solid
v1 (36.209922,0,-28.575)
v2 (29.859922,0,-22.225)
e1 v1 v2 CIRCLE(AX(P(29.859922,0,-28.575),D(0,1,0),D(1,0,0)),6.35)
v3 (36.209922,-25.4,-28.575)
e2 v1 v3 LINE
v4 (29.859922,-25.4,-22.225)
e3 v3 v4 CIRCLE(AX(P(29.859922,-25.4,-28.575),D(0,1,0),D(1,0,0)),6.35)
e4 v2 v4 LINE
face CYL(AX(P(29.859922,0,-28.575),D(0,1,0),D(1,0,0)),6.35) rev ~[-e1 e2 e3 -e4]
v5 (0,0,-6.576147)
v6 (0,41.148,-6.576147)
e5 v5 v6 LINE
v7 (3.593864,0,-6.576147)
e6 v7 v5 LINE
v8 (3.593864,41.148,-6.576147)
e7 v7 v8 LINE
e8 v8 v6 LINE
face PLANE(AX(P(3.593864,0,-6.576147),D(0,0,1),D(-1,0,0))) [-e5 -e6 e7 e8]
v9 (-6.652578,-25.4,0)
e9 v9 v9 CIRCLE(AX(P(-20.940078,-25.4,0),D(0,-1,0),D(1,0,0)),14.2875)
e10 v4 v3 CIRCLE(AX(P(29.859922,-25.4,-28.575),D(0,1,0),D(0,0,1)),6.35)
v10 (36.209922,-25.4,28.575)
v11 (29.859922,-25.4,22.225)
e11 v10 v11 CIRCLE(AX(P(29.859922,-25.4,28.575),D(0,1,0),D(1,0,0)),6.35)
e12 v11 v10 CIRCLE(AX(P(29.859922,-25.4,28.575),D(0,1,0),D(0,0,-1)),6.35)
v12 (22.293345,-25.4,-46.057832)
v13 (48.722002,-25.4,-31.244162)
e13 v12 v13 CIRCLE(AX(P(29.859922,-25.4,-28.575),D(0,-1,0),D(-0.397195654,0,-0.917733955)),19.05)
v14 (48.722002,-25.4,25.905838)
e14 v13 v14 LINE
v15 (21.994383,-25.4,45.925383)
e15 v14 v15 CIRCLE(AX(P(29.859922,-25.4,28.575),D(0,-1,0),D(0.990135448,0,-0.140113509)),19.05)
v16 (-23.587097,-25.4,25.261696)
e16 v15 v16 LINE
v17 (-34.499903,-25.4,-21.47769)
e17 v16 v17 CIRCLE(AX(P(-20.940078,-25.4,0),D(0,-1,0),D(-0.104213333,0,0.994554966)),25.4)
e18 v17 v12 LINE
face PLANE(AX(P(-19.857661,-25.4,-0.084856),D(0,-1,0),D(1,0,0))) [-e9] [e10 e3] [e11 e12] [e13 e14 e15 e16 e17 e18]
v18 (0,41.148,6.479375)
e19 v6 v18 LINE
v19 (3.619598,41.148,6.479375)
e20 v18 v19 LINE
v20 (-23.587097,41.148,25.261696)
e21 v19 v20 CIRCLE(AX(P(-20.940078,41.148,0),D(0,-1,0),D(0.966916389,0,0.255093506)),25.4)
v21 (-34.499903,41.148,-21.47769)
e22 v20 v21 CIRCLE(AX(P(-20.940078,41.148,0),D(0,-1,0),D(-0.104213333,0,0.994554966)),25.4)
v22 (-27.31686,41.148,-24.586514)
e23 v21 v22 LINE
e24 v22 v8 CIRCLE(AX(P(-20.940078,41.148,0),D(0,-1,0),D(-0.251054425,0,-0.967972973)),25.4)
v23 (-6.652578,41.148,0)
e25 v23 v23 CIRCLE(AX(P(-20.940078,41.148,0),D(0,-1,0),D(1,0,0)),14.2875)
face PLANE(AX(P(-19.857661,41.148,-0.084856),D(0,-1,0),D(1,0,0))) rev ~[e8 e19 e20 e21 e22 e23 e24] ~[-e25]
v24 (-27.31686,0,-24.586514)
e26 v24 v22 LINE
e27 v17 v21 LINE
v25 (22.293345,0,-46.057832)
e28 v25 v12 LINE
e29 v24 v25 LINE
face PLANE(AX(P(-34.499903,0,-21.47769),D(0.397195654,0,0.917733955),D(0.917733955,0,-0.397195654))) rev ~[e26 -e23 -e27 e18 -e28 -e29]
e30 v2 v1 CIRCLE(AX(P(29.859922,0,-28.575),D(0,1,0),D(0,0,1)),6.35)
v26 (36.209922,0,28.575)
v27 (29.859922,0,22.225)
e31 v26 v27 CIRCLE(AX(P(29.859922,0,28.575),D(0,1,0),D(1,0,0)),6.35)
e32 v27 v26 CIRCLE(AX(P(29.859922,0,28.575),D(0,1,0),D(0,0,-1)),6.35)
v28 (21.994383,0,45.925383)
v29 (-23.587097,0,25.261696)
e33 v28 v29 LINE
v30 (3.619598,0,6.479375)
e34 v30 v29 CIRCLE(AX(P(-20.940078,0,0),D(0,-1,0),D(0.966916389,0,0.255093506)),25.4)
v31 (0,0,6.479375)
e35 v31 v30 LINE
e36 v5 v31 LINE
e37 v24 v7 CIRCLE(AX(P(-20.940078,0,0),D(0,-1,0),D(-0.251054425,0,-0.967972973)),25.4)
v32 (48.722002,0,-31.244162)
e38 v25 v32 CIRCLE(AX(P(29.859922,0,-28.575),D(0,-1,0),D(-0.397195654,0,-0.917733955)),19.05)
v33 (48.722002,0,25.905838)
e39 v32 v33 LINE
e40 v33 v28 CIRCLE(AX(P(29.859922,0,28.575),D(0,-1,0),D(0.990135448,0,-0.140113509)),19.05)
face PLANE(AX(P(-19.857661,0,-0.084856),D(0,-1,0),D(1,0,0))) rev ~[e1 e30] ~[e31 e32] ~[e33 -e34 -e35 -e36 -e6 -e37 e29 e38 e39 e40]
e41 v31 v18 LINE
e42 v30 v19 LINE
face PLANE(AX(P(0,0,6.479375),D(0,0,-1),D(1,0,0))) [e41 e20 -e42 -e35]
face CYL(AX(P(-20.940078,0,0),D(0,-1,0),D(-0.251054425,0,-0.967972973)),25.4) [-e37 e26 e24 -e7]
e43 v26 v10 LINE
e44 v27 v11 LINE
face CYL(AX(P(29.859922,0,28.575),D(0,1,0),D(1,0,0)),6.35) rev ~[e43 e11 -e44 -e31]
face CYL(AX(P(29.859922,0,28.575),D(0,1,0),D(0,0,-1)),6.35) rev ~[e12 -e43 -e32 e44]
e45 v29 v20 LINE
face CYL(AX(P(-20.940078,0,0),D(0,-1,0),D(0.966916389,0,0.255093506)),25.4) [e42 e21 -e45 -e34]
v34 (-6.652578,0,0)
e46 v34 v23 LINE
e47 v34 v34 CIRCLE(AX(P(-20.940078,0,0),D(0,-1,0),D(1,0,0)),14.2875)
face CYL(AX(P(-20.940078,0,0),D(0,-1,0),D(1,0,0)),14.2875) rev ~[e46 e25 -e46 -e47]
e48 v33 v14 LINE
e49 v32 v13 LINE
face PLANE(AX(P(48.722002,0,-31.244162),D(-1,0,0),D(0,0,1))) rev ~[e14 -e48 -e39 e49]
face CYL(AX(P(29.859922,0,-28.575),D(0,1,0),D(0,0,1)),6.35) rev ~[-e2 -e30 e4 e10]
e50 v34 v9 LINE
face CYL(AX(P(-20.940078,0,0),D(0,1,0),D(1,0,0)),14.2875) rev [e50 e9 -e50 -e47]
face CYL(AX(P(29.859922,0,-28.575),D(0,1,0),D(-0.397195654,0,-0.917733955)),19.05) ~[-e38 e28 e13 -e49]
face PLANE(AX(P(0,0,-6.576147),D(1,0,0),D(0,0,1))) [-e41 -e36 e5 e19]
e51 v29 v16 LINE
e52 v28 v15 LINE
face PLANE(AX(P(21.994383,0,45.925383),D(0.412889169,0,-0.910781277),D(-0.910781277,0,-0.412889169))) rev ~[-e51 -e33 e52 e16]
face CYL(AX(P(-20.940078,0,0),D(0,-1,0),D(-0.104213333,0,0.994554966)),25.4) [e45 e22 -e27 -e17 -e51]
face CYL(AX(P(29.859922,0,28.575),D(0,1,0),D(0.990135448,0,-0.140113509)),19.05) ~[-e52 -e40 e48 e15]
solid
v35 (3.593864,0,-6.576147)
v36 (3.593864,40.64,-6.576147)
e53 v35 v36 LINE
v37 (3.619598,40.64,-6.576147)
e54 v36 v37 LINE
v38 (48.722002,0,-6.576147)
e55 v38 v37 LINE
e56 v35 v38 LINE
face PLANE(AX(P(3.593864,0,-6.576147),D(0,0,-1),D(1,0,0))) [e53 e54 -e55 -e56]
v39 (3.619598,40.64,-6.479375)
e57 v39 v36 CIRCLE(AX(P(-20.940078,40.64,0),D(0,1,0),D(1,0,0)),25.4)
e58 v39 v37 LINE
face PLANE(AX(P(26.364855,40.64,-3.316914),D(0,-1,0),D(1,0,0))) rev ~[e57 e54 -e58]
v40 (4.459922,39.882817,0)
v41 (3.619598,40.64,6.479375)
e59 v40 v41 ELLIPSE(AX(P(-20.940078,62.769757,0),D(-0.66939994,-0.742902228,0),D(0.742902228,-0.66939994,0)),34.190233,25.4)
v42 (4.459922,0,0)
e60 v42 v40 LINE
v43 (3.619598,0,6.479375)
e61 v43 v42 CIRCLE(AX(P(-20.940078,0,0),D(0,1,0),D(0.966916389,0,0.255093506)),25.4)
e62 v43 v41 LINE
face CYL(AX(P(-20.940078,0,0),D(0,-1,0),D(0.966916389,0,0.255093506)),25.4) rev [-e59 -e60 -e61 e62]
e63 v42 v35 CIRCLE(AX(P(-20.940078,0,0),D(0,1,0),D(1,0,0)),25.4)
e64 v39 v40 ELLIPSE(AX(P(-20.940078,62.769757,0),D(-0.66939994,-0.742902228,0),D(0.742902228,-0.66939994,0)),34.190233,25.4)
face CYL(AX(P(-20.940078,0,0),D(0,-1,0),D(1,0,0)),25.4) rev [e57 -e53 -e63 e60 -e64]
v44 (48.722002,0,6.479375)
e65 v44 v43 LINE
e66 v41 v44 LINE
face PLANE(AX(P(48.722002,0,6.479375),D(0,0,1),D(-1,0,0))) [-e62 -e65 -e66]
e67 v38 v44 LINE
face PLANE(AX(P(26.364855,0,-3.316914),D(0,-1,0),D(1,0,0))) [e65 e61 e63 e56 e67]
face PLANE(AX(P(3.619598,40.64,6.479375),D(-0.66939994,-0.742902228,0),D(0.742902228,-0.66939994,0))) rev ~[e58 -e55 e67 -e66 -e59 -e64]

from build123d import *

# Parameters (mm, degrees)
F0_R     = 14.2875
F1_DEPTH = 25.4
F2_DEPTH = 41.148
F3_DEPTH = 40.64
F5_DEPTH = 25.4


with BuildPart() as f1:
    # F0 (on Front) → F1 (new body)
    with BuildSketch(Plane.XZ):
        with BuildLine():
            Line((0, -6.5761469305), (0, 0))
            Line((0, 0), (0, 6.4793750644))
            Line((0, 6.4793750644), (3.6195983623, 6.4793750644))
            ThreePointArc((3.6195983623, 6.4793750644), (-6.5097266562, 20.9027501202), (-23.5870965608, 25.2616961481))
            ThreePointArc((-23.5870965608, 25.2616961481), (-45.6748305827, 5.7751199465), (-34.4999026403, -21.4776896658))
            Line((-34.4999026403, -21.4776896658), (-27.3168603147, -24.5865135025))
            ThreePointArc((-27.3168603147, -24.5865135025), (-8.1528212193, -21.9464362992), (3.5938637092, -6.5761469305))
            Line((3.5938637092, -6.5761469305), (0, -6.5761469305))
        make_face()
        with Locations((-20.9400779136, 0)):
            Circle(F0_R, mode=Mode.SUBTRACT)
        with BuildLine():
            Line((0, 6.4793750644), (0, 0))
            Line((0, 0), (4.4599220864, 0))
            ThreePointArc((4.4599220864, 0), (4.2489651152, 3.2668197527), (3.6195983623, 6.4793750644))
            Line((3.6195983623, 6.4793750644), (0, 6.4793750644))
        make_face()
        with BuildLine():
            Line((4.4599220864, 0), (0, 0))
            Line((0, 0), (0, -6.5761469305))
            Line((0, -6.5761469305), (3.5938637092, -6.5761469305))
            ThreePointArc((3.5938637092, -6.5761469305), (4.2424767346, -3.3164651952), (4.4599220864, 0))
        make_face()
        with BuildLine():
            Line((29.8599220864, 0), (4.4599220864, 0))
            ThreePointArc((4.4599220864, 0), (4.2424767346, -3.3164651952), (3.5938637092, -6.5761469305))
            Line((3.5938637092, -6.5761469305), (48.7220023626, -6.5761469305))
            Line((48.7220023626, -6.5761469305), (48.7220023626, 0))
            Line((48.7220023626, 0), (29.8599220864, 0))
        make_face()
        with BuildLine():
            ThreePointArc((3.6195983623, 6.4793750644), (4.2489651152, 3.2668197527), (4.4599220864, 0))
            Line((4.4599220864, 0), (29.8599220864, 0))
            Line((29.8599220864, 0), (48.7220023626, 0))
            Line((48.7220023626, 0), (48.7220023626, 6.4793750644))
            Line((48.7220023626, 6.4793750644), (3.6195983623, 6.4793750644))
        make_face()
        with BuildLine():
            Line((48.7220023626, -6.5761469305), (3.5938637092, -6.5761469305))
            ThreePointArc((3.5938637092, -6.5761469305), (-8.1528212193, -21.9464362992), (-27.3168603147, -24.5865135025))
            Line((-27.3168603147, -24.5865135025), (22.2933448748, -46.0578318444))
            ThreePointArc((22.2933448748, -46.0578318444), (39.1743355589, -45.1925871192), (48.7220023626, -31.2441623508))
            Line((48.7220023626, -31.2441623508), (48.7220023626, -25.9058376492))
            Line((48.7220023626, -25.9058376492), (48.7220023626, -6.5761469305))
        make_face()
        with BuildLine():
            ThreePointArc((29.8599220864, -22.225), (34.350050147, -24.0848719395), (36.2099220864, -28.575))
            ThreePointArc((36.2099220864, -28.575), (25.3697940259, -33.0651280605), (29.8599220864, -22.225))
        make_face(mode=Mode.SUBTRACT)
        with BuildLine():
            ThreePointArc((-23.5870965608, 25.2616961481), (-6.5097266562, 20.9027501202), (3.6195983623, 6.4793750644))
            Line((3.6195983623, 6.4793750644), (48.7220023626, 6.4793750644))
            Line((48.7220023626, 6.4793750644), (48.7220023626, 25.9058376492))
            ThreePointArc((48.7220023626, 25.9058376492), (41.2803657765, 43.8221625532), (21.9943834178, 45.9253833229))
            Line((21.9943834178, 45.9253833229), (-23.5870965608, 25.2616961481))
        make_face()
        with BuildLine():
            ThreePointArc((29.8599220864, 22.225), (25.3697940259, 33.0651280605), (36.2099220864, 28.575))
            ThreePointArc((36.2099220864, 28.575), (34.350050147, 24.0848719395), (29.8599220864, 22.225))
        make_face(mode=Mode.SUBTRACT)
    extrude(amount=F1_DEPTH)

    # F0 (on Front) → F2 (join)
    with BuildSketch(Plane.XZ):
        with BuildLine():
            Line((0, -6.5761469305), (0, 0))
            Line((0, 0), (0, 6.4793750644))
            Line((0, 6.4793750644), (3.6195983623, 6.4793750644))
            ThreePointArc((3.6195983623, 6.4793750644), (-6.5097266562, 20.9027501202), (-23.5870965608, 25.2616961481))
            ThreePointArc((-23.5870965608, 25.2616961481), (-45.6748305827, 5.7751199465), (-34.4999026403, -21.4776896658))
            Line((-34.4999026403, -21.4776896658), (-27.3168603147, -24.5865135025))
            ThreePointArc((-27.3168603147, -24.5865135025), (-8.1528212193, -21.9464362992), (3.5938637092, -6.5761469305))
            Line((3.5938637092, -6.5761469305), (0, -6.5761469305))
        make_face()
        with Locations((-20.9400779136, 0)):
            Circle(F0_R, mode=Mode.SUBTRACT)
    extrude(amount=-F2_DEPTH)


with BuildPart() as f3:
    # F0 (on Front) → F3 (new body)
    with BuildSketch(Plane.XZ):
        with BuildLine():
            Line((29.8599220864, 0), (4.4599220864, 0))
            ThreePointArc((4.4599220864, 0), (4.2424767346, -3.3164651952), (3.5938637092, -6.5761469305))
            Line((3.5938637092, -6.5761469305), (48.7220023626, -6.5761469305))
            Line((48.7220023626, -6.5761469305), (48.7220023626, 0))
            Line((48.7220023626, 0), (29.8599220864, 0))
        make_face()
        with BuildLine():
            ThreePointArc((3.6195983623, 6.4793750644), (4.2489651152, 3.2668197527), (4.4599220864, 0))
            Line((4.4599220864, 0), (29.8599220864, 0))
            Line((29.8599220864, 0), (48.7220023626, 0))
            Line((48.7220023626, 0), (48.7220023626, 6.4793750644))
            Line((48.7220023626, 6.4793750644), (3.6195983623, 6.4793750644))
        make_face()
    extrude(amount=-F3_DEPTH)

    # F4 (on face) → F5 (cut)
    with BuildSketch(Plane.XY.offset(6.4793750644)):
        Polygon((48.7220023626, 40.64), (3.6195983623, 40.64), (48.7220023626, 0), align=None)
    extrude(amount=-F5_DEPTH, mode=Mode.SUBTRACT)


solid = Compound([f1.part, f3.part])
